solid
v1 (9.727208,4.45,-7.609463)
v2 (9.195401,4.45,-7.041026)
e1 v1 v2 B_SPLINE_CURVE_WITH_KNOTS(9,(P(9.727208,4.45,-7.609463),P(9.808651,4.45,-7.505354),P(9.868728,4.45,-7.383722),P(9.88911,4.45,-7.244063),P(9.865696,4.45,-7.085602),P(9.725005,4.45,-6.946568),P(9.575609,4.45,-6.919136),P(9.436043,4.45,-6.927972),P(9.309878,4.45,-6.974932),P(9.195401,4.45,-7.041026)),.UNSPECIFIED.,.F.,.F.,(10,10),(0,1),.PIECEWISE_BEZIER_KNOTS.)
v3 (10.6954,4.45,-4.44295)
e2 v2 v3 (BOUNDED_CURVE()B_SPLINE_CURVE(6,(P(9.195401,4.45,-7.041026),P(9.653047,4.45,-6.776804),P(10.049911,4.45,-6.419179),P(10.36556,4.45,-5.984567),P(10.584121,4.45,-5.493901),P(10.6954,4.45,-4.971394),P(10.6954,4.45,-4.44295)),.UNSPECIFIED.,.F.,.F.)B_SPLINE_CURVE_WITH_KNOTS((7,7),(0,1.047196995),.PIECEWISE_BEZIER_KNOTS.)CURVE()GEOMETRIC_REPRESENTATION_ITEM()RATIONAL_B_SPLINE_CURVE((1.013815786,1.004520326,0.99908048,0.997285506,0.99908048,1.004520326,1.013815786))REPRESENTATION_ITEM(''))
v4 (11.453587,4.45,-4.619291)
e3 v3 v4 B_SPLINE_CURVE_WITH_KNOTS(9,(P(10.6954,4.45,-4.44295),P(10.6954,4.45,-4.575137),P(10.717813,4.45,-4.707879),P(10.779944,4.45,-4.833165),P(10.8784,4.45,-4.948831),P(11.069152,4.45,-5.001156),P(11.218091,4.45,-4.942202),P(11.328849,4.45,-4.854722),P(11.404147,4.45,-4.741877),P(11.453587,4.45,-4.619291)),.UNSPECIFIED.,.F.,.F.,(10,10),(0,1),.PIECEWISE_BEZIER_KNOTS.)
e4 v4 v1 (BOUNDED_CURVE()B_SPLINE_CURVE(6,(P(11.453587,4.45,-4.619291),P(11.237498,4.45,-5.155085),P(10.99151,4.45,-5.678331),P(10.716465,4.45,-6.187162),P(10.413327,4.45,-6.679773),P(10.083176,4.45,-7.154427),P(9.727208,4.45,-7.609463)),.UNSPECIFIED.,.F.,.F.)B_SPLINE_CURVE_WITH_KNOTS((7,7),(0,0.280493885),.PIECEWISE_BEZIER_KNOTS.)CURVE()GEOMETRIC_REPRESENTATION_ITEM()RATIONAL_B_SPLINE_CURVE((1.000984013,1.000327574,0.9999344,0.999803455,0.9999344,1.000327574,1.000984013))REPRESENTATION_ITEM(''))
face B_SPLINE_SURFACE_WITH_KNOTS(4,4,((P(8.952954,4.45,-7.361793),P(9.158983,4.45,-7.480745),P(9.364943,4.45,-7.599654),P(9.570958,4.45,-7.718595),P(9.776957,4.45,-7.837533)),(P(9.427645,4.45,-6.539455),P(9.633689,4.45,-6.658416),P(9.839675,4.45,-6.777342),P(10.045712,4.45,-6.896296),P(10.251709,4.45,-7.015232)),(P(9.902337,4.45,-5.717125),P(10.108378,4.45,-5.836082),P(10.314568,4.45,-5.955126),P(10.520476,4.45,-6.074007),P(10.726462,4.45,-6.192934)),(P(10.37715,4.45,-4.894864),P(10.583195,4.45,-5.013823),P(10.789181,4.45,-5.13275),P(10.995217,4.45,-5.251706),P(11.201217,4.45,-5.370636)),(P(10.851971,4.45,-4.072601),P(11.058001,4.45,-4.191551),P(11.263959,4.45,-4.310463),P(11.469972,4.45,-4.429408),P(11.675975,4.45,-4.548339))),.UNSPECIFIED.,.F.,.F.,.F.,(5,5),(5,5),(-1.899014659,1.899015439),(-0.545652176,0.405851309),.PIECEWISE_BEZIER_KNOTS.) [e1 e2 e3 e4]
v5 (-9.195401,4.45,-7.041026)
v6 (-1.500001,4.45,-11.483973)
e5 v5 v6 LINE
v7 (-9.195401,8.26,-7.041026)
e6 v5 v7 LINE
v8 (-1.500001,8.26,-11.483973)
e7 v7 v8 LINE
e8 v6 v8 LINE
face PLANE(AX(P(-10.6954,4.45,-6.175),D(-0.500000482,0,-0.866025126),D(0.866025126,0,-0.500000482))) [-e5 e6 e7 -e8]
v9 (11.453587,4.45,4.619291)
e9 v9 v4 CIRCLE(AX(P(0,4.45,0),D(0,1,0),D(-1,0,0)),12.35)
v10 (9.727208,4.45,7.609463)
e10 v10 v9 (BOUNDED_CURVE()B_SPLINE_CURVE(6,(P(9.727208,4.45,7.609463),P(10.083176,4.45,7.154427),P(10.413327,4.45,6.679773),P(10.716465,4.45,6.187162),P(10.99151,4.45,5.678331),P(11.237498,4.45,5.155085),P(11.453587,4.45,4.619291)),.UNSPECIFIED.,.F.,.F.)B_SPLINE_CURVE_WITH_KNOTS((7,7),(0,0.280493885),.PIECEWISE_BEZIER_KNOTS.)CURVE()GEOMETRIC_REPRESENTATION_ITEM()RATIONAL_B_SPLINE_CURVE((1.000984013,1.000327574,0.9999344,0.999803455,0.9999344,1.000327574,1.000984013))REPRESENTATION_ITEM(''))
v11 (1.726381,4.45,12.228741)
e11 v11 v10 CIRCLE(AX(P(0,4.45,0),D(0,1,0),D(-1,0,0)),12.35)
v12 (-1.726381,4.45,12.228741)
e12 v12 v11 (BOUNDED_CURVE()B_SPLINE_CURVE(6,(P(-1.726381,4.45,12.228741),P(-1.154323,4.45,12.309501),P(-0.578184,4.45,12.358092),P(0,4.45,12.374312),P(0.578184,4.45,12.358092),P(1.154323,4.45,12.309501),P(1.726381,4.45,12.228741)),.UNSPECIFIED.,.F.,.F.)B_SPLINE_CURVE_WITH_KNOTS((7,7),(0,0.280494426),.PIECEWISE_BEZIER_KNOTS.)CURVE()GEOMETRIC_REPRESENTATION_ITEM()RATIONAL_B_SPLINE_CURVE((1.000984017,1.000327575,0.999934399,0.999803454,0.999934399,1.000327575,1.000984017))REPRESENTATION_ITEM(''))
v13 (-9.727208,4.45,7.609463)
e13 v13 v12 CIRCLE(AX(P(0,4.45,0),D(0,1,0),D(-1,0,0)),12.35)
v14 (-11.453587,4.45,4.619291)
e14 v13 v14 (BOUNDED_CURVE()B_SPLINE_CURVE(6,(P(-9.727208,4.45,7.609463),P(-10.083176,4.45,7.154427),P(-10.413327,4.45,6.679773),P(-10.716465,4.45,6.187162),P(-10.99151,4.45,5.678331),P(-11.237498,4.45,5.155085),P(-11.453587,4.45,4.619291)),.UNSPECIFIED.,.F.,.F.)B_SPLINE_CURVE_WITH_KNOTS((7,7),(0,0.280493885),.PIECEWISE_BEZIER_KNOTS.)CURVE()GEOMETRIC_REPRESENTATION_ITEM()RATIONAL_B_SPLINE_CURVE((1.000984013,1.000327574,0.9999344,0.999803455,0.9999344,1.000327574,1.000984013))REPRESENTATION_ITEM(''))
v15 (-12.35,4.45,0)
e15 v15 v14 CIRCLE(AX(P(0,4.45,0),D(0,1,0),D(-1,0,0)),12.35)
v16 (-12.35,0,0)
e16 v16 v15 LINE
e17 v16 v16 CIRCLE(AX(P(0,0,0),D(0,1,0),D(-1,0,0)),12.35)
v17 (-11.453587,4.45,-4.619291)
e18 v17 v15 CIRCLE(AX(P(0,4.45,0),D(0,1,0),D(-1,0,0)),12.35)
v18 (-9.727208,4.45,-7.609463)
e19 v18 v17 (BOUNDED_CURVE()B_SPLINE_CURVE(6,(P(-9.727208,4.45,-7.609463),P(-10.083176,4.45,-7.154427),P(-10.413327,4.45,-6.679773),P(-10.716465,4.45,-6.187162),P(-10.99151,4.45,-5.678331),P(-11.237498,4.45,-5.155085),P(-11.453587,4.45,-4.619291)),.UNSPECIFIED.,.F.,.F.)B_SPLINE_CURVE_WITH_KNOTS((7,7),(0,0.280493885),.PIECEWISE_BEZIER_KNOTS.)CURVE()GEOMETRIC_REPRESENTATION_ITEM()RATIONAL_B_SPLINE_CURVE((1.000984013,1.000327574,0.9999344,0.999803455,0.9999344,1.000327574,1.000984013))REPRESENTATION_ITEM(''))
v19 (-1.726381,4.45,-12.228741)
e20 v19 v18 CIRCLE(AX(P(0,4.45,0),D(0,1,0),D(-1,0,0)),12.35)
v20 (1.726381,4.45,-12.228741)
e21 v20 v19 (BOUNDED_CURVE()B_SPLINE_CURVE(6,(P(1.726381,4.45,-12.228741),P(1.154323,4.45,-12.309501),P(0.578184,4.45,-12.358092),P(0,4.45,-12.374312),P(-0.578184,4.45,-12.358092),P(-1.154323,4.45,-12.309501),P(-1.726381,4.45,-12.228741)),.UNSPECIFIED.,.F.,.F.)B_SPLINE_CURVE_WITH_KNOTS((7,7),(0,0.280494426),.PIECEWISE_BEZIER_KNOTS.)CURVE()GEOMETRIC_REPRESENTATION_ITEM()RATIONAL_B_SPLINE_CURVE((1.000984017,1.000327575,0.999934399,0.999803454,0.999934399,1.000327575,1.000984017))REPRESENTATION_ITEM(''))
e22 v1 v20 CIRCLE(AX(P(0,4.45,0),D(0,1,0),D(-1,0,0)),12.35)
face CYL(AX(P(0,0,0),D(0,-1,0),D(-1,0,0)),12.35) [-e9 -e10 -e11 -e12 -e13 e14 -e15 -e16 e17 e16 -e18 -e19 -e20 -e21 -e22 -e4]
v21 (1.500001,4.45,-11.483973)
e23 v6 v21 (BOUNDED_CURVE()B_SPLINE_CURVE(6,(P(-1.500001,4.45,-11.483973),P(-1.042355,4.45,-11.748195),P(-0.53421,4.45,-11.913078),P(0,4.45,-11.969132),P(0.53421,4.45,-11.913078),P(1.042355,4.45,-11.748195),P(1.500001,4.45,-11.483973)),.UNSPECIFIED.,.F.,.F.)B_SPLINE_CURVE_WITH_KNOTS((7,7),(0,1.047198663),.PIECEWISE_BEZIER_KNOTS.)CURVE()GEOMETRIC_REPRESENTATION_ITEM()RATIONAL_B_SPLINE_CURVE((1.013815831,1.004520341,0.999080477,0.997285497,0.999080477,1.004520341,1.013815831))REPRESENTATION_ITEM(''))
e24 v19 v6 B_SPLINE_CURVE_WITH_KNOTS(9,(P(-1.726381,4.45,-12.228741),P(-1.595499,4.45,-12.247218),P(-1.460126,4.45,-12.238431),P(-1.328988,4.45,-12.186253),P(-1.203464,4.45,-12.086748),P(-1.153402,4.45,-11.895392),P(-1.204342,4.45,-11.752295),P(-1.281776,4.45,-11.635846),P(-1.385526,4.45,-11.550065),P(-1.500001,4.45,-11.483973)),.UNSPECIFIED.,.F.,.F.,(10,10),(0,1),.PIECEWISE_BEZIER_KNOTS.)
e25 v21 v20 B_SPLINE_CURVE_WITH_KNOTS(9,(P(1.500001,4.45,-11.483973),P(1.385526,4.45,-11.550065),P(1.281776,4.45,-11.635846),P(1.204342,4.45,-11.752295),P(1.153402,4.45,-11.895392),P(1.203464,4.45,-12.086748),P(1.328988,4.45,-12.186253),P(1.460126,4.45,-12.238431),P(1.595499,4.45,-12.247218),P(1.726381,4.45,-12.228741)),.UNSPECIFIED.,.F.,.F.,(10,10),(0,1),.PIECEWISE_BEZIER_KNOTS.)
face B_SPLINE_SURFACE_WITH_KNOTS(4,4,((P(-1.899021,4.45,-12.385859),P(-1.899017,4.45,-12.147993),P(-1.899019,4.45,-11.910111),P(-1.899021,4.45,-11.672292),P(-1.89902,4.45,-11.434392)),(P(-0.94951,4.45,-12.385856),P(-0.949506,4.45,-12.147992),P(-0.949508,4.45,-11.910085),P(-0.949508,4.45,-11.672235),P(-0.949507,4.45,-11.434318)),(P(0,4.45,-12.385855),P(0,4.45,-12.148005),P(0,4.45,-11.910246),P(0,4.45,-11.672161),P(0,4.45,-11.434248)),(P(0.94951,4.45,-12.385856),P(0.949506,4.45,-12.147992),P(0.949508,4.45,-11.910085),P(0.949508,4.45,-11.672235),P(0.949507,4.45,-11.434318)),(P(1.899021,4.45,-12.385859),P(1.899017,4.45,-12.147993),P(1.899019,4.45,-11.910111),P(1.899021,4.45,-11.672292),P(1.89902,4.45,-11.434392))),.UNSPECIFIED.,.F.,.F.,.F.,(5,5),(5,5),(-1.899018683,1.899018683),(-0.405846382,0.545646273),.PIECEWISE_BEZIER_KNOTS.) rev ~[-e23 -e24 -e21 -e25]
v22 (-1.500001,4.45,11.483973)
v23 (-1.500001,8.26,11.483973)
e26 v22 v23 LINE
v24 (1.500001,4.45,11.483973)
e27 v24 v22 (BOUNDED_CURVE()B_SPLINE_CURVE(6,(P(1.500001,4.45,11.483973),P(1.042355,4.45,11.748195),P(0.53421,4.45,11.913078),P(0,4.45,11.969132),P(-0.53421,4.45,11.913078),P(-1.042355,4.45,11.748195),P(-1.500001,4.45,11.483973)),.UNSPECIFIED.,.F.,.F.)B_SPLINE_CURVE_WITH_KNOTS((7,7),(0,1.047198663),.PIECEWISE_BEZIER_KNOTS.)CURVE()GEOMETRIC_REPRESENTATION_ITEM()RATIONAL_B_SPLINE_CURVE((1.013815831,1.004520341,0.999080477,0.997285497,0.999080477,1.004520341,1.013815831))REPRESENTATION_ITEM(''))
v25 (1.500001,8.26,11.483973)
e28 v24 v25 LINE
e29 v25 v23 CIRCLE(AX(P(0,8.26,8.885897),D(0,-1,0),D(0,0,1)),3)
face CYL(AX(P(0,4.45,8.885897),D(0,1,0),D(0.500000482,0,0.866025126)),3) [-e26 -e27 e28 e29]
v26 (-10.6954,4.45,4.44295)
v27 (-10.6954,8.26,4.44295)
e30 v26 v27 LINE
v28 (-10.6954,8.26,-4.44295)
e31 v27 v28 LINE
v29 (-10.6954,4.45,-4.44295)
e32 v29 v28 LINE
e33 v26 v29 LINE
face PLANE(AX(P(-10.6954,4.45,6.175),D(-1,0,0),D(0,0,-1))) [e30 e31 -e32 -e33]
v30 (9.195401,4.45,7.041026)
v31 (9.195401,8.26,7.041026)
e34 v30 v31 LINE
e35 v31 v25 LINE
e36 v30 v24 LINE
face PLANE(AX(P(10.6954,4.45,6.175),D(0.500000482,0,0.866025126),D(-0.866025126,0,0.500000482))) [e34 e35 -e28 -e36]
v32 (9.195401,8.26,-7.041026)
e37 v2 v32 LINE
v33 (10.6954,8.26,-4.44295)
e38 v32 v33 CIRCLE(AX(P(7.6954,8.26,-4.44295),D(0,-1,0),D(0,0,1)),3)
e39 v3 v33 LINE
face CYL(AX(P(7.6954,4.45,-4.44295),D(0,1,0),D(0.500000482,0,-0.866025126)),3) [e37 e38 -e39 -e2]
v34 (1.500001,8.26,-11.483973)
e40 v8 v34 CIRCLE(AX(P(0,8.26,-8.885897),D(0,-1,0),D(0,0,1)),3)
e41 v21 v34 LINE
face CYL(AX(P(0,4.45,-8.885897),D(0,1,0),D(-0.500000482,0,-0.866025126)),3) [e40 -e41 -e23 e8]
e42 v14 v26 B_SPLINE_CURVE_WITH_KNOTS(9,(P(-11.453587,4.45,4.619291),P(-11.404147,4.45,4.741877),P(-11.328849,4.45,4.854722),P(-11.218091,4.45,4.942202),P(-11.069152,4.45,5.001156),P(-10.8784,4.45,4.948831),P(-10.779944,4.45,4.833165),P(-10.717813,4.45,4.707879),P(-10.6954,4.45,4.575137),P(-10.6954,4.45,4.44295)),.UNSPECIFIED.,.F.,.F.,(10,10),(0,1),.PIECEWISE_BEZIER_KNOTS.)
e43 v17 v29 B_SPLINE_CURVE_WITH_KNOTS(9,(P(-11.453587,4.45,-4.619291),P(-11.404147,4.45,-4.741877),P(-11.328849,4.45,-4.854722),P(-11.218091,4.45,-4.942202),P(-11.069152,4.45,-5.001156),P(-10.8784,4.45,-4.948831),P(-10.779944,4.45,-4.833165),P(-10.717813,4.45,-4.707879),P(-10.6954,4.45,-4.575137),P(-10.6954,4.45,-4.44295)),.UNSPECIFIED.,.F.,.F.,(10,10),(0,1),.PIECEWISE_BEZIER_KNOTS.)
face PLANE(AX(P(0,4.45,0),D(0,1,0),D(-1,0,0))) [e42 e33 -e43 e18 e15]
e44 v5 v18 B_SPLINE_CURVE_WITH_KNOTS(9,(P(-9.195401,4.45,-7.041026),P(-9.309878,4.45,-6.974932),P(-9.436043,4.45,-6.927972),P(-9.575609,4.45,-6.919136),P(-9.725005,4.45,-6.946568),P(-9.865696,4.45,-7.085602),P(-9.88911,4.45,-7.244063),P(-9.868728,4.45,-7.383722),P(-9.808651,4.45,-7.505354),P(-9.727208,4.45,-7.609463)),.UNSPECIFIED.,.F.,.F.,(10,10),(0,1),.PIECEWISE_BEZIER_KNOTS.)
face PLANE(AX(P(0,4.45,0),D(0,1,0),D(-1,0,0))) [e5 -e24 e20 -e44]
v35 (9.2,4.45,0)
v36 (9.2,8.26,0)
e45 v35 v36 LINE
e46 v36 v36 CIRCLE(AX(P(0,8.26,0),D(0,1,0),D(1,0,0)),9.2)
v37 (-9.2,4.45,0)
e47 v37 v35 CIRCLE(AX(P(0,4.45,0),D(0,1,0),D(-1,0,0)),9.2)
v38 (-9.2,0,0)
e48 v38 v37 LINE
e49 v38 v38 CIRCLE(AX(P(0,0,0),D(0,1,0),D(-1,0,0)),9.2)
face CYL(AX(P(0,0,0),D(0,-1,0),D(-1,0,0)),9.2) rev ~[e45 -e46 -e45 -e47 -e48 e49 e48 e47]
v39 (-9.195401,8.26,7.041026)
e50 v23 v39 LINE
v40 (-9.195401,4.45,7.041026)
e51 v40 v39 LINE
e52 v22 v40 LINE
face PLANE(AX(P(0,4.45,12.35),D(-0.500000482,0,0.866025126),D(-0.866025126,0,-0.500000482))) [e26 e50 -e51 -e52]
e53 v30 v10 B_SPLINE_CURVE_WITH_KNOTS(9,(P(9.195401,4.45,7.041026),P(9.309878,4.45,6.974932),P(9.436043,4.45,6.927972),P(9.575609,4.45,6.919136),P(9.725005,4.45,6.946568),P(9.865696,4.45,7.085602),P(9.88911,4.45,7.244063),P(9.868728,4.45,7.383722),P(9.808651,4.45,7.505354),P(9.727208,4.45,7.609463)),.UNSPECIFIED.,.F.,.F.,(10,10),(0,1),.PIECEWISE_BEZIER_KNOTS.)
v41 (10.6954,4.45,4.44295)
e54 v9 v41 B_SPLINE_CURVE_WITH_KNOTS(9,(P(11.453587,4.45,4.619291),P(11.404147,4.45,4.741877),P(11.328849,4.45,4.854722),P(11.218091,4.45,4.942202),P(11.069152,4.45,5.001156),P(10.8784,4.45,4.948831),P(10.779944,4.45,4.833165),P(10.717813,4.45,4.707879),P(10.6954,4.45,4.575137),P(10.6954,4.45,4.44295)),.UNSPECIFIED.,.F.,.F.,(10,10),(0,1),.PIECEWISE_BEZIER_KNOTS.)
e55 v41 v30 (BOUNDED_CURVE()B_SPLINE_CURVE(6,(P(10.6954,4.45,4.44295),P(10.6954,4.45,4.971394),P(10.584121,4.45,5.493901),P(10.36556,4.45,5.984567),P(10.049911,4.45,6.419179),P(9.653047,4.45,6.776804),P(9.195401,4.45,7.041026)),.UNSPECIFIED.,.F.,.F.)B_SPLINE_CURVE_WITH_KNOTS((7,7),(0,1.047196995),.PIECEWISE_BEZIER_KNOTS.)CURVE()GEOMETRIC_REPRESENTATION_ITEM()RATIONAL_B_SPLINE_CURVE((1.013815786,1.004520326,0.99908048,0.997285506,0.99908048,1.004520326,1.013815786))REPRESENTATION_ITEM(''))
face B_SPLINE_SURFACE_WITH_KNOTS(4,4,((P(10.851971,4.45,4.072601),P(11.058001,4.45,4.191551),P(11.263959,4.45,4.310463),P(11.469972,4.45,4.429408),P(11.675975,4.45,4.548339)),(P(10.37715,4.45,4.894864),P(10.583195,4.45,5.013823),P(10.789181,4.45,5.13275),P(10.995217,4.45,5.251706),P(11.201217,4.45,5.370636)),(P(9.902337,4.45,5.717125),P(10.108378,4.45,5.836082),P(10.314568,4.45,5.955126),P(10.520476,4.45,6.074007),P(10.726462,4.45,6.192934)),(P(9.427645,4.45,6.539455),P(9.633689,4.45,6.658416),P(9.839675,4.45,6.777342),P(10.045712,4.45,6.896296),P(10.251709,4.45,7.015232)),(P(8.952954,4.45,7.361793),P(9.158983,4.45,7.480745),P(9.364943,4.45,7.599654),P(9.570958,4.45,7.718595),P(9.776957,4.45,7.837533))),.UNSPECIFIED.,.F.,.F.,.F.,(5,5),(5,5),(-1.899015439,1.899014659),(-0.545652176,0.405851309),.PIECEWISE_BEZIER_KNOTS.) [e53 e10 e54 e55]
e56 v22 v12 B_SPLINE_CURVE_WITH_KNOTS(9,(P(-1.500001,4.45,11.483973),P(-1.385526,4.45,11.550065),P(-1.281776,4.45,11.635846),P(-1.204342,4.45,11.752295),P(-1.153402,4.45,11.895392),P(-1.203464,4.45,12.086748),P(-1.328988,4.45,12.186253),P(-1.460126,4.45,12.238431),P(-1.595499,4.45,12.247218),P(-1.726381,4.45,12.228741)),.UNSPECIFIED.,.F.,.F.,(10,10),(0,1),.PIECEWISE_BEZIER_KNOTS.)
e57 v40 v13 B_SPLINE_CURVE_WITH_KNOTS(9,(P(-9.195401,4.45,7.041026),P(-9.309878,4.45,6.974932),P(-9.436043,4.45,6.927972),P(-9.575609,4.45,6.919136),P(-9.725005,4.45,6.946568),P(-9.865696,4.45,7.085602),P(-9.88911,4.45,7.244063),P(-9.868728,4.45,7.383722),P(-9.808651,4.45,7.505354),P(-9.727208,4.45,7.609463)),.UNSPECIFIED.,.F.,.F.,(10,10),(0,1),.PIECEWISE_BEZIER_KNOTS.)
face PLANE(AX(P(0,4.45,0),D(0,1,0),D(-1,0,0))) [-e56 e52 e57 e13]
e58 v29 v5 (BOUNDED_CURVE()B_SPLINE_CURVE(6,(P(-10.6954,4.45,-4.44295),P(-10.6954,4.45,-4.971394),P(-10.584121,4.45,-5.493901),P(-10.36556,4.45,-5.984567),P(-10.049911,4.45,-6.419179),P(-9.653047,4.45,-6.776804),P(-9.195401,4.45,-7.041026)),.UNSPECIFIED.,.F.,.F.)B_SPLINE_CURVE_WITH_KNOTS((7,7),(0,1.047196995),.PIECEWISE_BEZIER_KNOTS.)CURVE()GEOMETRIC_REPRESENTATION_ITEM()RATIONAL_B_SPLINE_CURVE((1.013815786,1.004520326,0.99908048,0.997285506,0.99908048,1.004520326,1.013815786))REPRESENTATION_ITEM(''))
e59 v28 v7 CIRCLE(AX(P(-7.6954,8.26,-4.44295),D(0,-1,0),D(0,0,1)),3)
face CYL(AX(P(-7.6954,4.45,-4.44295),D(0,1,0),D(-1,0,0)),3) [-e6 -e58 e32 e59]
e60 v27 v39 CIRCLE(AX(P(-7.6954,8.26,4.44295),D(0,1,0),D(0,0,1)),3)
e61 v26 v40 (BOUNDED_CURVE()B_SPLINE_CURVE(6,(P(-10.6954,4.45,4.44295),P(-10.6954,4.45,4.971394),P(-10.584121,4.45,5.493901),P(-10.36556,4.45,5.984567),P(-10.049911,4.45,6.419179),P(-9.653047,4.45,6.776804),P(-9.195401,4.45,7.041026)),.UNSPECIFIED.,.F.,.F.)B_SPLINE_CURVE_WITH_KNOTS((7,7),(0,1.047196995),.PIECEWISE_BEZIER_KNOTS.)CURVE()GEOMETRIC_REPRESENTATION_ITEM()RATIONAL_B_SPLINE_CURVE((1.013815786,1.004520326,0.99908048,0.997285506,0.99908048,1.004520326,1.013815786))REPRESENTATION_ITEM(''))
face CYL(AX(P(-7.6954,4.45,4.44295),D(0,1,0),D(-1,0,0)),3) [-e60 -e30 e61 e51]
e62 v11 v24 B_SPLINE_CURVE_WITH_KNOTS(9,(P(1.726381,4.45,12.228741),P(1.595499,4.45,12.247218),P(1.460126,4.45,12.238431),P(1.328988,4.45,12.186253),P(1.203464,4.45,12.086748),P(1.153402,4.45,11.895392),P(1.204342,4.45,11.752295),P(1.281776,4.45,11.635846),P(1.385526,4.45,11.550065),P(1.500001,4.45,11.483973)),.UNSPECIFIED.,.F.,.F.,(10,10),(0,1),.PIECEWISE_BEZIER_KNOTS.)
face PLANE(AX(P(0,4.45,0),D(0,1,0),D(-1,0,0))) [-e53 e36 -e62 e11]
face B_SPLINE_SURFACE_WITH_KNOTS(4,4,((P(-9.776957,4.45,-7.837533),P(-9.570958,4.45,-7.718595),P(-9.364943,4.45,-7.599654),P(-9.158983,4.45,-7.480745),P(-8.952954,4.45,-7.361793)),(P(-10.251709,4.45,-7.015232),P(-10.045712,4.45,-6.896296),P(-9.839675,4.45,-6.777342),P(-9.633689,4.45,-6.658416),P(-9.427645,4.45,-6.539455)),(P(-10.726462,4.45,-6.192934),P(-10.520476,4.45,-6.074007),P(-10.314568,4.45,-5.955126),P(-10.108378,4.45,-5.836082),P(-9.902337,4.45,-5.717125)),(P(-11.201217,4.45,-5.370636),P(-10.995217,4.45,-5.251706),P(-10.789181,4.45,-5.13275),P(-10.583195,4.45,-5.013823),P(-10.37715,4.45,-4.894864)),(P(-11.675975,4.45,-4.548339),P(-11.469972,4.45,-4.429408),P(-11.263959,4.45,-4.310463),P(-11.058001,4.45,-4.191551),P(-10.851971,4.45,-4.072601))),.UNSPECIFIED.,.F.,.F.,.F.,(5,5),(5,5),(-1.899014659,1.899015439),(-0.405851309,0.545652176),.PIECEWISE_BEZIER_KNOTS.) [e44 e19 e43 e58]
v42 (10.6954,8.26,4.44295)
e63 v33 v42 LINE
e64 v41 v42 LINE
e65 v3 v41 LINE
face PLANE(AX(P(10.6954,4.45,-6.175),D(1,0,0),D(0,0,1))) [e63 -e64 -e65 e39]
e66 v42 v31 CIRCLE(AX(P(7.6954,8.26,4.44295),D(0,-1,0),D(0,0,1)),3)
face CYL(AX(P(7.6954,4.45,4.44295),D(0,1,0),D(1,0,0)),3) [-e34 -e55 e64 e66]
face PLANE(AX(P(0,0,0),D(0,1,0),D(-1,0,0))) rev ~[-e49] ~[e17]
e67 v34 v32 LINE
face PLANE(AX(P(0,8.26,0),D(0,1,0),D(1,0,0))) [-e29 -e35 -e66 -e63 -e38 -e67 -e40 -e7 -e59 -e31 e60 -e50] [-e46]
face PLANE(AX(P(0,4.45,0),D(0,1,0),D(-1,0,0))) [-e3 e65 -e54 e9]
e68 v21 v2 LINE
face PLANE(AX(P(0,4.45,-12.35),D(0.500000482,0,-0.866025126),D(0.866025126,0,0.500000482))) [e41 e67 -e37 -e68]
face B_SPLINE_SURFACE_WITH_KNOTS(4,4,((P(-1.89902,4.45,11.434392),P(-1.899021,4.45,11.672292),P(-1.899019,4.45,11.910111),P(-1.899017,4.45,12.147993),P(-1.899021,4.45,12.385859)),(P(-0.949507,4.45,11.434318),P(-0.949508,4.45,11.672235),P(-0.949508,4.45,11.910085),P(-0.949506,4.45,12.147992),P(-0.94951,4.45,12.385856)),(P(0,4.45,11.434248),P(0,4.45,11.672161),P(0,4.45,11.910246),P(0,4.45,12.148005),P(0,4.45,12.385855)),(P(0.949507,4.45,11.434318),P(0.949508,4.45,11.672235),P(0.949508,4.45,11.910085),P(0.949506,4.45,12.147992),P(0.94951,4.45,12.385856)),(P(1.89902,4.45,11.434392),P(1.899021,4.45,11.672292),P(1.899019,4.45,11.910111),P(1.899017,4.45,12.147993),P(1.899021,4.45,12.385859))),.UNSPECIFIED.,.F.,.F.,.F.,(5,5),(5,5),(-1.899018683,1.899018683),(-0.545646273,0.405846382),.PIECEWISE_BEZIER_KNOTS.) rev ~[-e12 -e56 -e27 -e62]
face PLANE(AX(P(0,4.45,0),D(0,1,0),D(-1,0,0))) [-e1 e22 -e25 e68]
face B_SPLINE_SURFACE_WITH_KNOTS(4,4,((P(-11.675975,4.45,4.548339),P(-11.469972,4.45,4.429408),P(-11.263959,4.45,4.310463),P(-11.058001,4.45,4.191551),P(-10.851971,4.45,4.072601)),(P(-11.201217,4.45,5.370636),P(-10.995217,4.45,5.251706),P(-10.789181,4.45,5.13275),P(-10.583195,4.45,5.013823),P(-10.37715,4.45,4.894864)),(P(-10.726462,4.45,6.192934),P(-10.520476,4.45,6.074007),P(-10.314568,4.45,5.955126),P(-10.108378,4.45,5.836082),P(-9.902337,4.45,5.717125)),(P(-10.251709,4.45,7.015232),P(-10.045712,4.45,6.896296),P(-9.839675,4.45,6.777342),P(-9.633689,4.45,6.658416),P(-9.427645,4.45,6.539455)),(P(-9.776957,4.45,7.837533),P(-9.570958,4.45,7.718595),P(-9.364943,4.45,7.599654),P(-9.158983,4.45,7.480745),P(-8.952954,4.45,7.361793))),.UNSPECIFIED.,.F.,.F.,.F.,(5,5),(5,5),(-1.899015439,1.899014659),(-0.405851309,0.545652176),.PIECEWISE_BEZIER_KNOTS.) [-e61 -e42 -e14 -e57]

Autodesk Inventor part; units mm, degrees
ref_plane "YZ Plane" through (0, 0, 0) normal (1, 0, 0) x (0, 1, 0)
ref_plane "XZ Plane" through (0, 0, 0) normal (0, 1, 0) x (-1, 0, 0)
ref_plane "XY Plane" through (0, 0, 0) normal (0, 0, 1) x (1, 0, 0)
sketch "Sketch1" plane through (0, 0, 0) normal (0, 1, 0) x (-1, 0, 0)
  circle A0 centre (0, 0) radius 9.2
  circle A1 centre (0, 0) radius 12.35
  dimension "d0" = 18.4
  dimension "d1" = 3.15
  dimension "d9" = 24.7
extrude "Extrusion1" add sketch "Sketch1" along normal blind 4.45
thread "Thread1" size "M15x1" class "6H" standard "ANSI Metric M Profile" full length
sketch "Sketch2" plane through (0, 4.45, 0) normal (0, 1, 0) x (1, 0, 0)
  line L0 (-10.6954, 6.175) -> (0, 12.35)
  line L1 (0, 12.35) -> (10.6954, 6.175)
  line L2 (10.6954, 6.175) -> (10.6954, -6.175)
  line L3 (10.6954, -6.175) -> (0, -12.35)
  line L4 (0, -12.35) -> (-10.6954, -6.175)
  line L5 (-10.6954, -6.175) -> (-10.6954, 6.175)
  circle A0 centre (0, 0) radius 9.2
extrude "Extrusion2" add sketch "Sketch2" along normal blind 3.81
fillet "Fillet1" radius 3 6 edges at (10.6954, 6.355, 6.175) (10.6954, 6.355, -6.175) (0, 6.355, -12.35) (-10.6954, 6.355, -6.175) (-10.6954, 6.355, 6.175) (0, 6.355, 12.35)
properties part number "gearProx"
